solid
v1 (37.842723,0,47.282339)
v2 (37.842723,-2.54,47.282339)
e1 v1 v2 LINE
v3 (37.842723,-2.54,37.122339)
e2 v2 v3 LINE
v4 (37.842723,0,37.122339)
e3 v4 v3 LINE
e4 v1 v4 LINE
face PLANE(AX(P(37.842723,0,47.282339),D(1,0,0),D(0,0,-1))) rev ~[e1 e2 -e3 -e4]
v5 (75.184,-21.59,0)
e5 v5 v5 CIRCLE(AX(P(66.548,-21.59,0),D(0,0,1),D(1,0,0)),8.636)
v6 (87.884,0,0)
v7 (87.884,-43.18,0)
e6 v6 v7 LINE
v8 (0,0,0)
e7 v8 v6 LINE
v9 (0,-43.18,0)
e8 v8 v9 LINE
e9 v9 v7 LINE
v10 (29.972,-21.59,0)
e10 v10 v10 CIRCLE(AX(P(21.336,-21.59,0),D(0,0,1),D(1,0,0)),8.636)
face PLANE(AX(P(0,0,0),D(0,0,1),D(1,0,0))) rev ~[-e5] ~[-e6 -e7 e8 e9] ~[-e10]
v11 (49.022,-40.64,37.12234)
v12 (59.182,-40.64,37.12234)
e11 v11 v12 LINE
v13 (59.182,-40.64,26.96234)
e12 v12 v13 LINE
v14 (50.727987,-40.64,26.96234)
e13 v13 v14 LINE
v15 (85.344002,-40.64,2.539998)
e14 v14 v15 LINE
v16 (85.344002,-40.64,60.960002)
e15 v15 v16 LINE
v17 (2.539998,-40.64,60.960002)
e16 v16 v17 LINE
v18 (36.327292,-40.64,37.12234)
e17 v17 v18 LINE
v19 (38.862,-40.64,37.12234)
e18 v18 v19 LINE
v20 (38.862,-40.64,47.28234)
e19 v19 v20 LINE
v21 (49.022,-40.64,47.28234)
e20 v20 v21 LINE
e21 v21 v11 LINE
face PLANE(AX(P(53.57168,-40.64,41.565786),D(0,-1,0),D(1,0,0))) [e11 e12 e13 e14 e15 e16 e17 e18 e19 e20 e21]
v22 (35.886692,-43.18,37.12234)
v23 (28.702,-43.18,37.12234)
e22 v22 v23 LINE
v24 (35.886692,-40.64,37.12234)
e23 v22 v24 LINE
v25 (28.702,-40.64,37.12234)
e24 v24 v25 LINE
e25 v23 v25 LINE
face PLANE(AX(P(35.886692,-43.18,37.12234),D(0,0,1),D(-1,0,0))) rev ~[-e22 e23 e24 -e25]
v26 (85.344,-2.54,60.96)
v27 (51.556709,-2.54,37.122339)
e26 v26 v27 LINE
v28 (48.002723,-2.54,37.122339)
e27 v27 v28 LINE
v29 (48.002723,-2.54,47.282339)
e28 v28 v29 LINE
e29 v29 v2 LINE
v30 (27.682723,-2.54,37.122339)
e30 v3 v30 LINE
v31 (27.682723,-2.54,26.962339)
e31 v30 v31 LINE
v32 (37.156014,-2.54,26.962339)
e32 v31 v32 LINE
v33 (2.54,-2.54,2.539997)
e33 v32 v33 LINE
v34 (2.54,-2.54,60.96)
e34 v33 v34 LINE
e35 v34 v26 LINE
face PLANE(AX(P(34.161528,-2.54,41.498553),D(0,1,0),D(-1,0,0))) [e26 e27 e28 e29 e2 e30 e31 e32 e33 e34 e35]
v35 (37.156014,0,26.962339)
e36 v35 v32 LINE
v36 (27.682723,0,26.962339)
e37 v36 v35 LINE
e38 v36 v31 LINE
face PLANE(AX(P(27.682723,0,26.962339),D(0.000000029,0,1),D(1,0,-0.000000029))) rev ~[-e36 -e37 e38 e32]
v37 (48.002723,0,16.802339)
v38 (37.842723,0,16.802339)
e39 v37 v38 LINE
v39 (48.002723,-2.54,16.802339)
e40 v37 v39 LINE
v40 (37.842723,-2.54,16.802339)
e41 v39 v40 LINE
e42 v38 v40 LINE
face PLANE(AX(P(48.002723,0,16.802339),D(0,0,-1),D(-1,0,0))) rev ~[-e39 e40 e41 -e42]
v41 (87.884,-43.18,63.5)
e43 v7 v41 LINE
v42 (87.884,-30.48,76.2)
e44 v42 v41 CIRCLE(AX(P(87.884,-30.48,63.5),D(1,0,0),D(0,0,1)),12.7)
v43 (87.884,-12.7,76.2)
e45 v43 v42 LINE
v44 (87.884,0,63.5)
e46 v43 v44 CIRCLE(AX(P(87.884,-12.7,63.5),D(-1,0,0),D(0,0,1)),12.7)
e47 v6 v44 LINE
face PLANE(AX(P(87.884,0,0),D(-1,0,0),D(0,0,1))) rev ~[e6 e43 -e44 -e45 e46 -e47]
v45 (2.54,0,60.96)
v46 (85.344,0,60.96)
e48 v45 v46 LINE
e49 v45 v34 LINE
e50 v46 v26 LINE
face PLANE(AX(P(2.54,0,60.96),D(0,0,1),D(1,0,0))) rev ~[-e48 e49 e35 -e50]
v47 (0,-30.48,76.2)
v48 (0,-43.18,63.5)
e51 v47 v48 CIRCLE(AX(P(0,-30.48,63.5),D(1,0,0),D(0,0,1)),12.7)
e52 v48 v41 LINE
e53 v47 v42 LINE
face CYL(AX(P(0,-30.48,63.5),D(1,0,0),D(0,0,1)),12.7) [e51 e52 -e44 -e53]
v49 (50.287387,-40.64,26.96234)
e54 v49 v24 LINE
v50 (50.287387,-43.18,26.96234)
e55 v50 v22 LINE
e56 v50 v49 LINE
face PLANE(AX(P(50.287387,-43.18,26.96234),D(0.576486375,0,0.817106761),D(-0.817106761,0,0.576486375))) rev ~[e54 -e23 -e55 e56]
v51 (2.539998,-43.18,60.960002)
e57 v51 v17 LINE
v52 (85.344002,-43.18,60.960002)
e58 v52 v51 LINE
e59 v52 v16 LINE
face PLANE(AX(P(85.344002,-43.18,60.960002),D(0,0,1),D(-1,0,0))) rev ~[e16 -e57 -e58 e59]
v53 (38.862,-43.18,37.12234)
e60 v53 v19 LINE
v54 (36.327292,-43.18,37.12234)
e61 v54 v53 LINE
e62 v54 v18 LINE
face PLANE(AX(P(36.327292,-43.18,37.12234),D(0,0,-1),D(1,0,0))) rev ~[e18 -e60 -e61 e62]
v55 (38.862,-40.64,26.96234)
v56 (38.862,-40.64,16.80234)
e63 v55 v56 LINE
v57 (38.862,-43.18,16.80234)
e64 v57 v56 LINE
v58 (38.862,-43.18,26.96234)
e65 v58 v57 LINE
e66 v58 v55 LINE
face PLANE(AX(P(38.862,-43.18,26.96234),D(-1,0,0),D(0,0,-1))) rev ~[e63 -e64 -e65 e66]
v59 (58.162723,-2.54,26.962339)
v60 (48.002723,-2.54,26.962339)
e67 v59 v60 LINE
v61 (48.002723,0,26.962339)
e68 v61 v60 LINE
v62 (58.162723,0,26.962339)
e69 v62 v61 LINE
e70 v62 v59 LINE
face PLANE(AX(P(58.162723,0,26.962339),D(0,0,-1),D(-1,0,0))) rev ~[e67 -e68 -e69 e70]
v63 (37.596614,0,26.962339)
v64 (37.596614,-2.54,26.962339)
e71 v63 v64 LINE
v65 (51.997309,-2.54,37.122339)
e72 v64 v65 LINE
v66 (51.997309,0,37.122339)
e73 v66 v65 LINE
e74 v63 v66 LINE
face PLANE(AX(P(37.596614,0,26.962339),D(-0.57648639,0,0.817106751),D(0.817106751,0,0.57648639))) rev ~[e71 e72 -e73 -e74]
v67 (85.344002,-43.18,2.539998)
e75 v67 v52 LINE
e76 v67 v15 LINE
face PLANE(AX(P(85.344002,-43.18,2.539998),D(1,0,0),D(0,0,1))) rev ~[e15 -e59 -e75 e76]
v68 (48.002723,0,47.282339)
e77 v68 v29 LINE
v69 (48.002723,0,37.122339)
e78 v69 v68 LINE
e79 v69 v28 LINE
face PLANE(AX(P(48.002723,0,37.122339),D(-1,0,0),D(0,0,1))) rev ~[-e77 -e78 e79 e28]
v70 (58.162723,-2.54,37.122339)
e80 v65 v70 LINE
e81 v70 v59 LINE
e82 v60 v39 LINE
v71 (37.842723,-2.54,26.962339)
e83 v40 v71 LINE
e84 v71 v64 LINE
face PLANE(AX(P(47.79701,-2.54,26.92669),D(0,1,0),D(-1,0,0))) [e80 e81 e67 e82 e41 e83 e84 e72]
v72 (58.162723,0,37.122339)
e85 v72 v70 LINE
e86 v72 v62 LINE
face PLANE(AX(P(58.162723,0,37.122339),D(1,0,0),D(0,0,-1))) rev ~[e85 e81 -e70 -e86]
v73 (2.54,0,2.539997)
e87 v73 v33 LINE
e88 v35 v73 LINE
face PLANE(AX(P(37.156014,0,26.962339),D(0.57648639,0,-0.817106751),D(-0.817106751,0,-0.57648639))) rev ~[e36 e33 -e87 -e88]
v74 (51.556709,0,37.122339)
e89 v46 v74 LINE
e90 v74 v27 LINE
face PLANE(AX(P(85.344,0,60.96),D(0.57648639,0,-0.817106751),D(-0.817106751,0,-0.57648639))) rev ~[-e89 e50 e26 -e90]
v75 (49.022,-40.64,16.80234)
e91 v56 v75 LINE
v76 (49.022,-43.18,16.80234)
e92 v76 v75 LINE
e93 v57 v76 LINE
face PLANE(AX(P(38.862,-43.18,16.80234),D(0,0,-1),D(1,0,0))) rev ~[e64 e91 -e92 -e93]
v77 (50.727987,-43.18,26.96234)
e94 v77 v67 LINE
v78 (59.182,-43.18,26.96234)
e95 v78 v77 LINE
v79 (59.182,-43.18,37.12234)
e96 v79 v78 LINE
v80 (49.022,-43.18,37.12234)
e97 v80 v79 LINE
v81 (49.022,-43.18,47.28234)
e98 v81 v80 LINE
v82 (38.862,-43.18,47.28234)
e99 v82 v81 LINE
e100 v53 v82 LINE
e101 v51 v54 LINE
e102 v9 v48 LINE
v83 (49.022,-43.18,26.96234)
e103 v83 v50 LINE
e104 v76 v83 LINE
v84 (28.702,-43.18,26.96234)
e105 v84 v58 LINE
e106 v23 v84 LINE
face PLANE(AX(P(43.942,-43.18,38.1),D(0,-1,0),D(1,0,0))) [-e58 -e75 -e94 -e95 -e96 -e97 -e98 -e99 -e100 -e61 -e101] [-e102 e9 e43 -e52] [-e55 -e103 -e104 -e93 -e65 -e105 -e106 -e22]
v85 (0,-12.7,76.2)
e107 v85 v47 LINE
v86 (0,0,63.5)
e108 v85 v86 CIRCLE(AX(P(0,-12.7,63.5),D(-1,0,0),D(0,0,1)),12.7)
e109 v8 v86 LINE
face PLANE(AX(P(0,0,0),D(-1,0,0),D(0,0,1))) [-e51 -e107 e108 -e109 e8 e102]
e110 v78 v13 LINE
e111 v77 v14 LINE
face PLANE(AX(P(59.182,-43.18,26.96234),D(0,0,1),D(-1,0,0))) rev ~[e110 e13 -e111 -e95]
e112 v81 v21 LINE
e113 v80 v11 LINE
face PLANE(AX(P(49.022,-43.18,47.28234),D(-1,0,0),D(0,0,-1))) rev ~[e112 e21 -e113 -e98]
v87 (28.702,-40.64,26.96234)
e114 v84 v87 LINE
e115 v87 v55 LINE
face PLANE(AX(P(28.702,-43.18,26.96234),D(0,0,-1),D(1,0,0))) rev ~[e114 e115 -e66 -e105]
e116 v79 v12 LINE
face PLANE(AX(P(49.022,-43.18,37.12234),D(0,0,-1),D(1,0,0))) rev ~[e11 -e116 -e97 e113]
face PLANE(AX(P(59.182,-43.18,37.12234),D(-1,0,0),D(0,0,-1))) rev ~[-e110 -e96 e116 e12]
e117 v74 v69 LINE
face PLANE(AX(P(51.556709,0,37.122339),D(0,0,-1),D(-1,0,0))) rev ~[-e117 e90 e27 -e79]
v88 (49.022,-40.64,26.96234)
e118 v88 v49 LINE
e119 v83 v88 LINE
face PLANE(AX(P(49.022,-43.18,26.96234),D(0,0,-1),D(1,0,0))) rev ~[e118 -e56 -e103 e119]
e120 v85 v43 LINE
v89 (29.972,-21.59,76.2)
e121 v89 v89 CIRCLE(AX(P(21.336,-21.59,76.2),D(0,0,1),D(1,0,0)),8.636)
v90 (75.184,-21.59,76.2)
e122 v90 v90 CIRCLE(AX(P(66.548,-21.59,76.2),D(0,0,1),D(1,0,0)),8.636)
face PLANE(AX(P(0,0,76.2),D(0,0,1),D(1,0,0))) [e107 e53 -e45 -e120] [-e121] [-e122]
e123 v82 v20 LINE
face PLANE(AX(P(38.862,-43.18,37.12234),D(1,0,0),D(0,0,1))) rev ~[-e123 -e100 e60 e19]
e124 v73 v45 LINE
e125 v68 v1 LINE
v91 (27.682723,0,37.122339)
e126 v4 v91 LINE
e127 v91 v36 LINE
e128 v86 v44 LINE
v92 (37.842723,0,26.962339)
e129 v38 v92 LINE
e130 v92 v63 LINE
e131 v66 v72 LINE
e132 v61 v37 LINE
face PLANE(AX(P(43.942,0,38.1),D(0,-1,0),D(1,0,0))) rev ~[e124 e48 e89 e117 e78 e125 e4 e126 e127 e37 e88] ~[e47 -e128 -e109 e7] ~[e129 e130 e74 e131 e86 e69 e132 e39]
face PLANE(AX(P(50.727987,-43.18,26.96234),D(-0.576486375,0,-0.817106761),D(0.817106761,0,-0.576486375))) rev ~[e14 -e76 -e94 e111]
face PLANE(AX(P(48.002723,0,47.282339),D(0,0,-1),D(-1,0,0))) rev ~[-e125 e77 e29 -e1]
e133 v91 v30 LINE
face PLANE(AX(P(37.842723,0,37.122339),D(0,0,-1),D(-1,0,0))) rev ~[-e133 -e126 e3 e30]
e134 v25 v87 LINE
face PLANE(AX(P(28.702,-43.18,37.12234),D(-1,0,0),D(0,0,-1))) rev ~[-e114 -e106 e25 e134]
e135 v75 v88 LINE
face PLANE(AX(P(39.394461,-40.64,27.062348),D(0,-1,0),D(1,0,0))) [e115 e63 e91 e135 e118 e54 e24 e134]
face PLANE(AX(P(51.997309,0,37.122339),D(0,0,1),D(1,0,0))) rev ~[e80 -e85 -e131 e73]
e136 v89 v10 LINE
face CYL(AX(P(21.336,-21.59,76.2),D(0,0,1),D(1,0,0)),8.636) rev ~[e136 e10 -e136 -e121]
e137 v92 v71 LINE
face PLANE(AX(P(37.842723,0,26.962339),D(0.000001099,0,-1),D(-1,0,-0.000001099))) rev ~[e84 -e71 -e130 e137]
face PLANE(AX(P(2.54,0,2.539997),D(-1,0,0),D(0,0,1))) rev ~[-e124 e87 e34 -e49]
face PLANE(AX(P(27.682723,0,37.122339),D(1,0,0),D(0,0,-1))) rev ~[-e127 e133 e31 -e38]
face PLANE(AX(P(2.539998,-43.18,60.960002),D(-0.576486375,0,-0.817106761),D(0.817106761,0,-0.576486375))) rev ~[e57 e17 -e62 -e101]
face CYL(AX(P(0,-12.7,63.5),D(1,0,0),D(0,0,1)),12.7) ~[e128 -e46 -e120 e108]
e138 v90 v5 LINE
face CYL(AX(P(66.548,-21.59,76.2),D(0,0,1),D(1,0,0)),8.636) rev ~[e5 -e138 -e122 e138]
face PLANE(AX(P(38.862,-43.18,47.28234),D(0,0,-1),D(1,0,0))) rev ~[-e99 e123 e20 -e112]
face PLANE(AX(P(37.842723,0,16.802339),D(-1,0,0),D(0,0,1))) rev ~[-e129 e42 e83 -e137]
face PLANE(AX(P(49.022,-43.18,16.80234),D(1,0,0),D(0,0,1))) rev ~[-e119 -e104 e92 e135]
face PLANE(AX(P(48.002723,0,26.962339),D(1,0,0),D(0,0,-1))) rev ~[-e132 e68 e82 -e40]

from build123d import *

# Parameters (mm, degrees)
F0_W     = 87.884
F0_H     = 76.2
F1_DEPTH = 43.18
F2_R     = 12.7
F4_DEPTH = 2.54
F5_DEPTH = 2.54
F7_DEPTH = 2.54
F8_R     = 8.636
F9_DEPTH = 76.201


# Not quite as in the source:
# - ends of sketch curves that miss each other by under 0.0002 mm in the source are joined


with BuildPart() as f1:
    # F0 (on Front) → F1 (new body)
    with BuildSketch(Plane.XZ):
        with Locations((43.942, 38.1)):
            Rectangle(F0_W, F0_H)
    extrude(amount=F1_DEPTH)

    # F2
    f2_edges = [f1.edges().sort_by_distance(p)[0] for p in [
        (43.942, -43.18, 76.2),
        (43.942, 0, 76.2),
    ]]
    fillet(f2_edges, radius=F2_R)

    # F3 (on face) → F4 (cut)
    with BuildSketch(Plane.XZ.offset(43.18)):
        Polygon((38.862, 47.2823401565), (43.942, 47.2823401565), (49.022, 47.2823401565), (49.022, 37.1223401565), (59.182, 37.1223401565), (59.182, 26.9623401565), (50.7279873173, 26.9623401565), (85.3440016508, 2.5399983492), (85.3440016508, 60.9600016508), (2.5399983492, 60.9600016508), (36.3272919048, 37.1223401565), (38.862, 37.1223401565), align=None)
    extrude(amount=-F4_DEPTH, mode=Mode.SUBTRACT)

    # F3 (on face) → F5 (cut)
    with BuildSketch(Plane.XZ.offset(43.18)):
        Polygon((50.2873871384, 26.9623401565), (35.8866917258, 37.1223401565), (28.702, 37.1223401565), (28.702, 26.9623401565), (38.862, 26.9623401565), (38.862, 16.8023401565), (43.942, 16.8023401565), (49.022, 16.8023401565), (49.022, 26.9623401565), align=None)
    extrude(amount=-F5_DEPTH, mode=Mode.SUBTRACT)

    # F6 (on face) → F7 (cut)
    with BuildSketch(Plane(origin=(0, 0, 0), x_dir=(-1, 0, 0), z_dir=(0, 1, 0))):
        Polygon((-48.0027233214, 47.2823394346), (-42.9227233214, 47.2823394346), (-37.8427233214, 47.2823394346), (-37.8427233214, 37.1223394346), (-27.6827233214, 37.1223394346), (-27.6827233214, 26.9623394346), (-37.1560138865, 26.9623391642), (-2.54, 2.5399966984), (-2.54, 60.96), (-85.344, 60.96), (-51.5567091082, 37.1223394346), (-48.0027233214, 37.1223394346), align=None)
        Polygon((-37.5966140538, 26.9623391642), (-51.9973092754, 37.1223394346), (-58.1627233214, 37.1223394346), (-58.1627233214, 26.9623394346), (-48.0027233214, 26.9623394346), (-48.0027233214, 16.8023394346), (-42.9227233214, 16.8023394346), (-37.8427233214, 16.8023394346), (-37.8427233214, 26.9623394346), align=None)
    extrude(amount=-F7_DEPTH, mode=Mode.SUBTRACT)

    # F8 (on face) → F9 (cut, through all)
    with BuildSketch(Plane.XY.offset(76.2)):
        with Locations((21.336, -21.59)):
            Circle(F8_R)
        with Locations((66.548, -21.59)):
            Circle(F8_R)
    extrude(amount=-F9_DEPTH, mode=Mode.SUBTRACT)


solid = f1.part
